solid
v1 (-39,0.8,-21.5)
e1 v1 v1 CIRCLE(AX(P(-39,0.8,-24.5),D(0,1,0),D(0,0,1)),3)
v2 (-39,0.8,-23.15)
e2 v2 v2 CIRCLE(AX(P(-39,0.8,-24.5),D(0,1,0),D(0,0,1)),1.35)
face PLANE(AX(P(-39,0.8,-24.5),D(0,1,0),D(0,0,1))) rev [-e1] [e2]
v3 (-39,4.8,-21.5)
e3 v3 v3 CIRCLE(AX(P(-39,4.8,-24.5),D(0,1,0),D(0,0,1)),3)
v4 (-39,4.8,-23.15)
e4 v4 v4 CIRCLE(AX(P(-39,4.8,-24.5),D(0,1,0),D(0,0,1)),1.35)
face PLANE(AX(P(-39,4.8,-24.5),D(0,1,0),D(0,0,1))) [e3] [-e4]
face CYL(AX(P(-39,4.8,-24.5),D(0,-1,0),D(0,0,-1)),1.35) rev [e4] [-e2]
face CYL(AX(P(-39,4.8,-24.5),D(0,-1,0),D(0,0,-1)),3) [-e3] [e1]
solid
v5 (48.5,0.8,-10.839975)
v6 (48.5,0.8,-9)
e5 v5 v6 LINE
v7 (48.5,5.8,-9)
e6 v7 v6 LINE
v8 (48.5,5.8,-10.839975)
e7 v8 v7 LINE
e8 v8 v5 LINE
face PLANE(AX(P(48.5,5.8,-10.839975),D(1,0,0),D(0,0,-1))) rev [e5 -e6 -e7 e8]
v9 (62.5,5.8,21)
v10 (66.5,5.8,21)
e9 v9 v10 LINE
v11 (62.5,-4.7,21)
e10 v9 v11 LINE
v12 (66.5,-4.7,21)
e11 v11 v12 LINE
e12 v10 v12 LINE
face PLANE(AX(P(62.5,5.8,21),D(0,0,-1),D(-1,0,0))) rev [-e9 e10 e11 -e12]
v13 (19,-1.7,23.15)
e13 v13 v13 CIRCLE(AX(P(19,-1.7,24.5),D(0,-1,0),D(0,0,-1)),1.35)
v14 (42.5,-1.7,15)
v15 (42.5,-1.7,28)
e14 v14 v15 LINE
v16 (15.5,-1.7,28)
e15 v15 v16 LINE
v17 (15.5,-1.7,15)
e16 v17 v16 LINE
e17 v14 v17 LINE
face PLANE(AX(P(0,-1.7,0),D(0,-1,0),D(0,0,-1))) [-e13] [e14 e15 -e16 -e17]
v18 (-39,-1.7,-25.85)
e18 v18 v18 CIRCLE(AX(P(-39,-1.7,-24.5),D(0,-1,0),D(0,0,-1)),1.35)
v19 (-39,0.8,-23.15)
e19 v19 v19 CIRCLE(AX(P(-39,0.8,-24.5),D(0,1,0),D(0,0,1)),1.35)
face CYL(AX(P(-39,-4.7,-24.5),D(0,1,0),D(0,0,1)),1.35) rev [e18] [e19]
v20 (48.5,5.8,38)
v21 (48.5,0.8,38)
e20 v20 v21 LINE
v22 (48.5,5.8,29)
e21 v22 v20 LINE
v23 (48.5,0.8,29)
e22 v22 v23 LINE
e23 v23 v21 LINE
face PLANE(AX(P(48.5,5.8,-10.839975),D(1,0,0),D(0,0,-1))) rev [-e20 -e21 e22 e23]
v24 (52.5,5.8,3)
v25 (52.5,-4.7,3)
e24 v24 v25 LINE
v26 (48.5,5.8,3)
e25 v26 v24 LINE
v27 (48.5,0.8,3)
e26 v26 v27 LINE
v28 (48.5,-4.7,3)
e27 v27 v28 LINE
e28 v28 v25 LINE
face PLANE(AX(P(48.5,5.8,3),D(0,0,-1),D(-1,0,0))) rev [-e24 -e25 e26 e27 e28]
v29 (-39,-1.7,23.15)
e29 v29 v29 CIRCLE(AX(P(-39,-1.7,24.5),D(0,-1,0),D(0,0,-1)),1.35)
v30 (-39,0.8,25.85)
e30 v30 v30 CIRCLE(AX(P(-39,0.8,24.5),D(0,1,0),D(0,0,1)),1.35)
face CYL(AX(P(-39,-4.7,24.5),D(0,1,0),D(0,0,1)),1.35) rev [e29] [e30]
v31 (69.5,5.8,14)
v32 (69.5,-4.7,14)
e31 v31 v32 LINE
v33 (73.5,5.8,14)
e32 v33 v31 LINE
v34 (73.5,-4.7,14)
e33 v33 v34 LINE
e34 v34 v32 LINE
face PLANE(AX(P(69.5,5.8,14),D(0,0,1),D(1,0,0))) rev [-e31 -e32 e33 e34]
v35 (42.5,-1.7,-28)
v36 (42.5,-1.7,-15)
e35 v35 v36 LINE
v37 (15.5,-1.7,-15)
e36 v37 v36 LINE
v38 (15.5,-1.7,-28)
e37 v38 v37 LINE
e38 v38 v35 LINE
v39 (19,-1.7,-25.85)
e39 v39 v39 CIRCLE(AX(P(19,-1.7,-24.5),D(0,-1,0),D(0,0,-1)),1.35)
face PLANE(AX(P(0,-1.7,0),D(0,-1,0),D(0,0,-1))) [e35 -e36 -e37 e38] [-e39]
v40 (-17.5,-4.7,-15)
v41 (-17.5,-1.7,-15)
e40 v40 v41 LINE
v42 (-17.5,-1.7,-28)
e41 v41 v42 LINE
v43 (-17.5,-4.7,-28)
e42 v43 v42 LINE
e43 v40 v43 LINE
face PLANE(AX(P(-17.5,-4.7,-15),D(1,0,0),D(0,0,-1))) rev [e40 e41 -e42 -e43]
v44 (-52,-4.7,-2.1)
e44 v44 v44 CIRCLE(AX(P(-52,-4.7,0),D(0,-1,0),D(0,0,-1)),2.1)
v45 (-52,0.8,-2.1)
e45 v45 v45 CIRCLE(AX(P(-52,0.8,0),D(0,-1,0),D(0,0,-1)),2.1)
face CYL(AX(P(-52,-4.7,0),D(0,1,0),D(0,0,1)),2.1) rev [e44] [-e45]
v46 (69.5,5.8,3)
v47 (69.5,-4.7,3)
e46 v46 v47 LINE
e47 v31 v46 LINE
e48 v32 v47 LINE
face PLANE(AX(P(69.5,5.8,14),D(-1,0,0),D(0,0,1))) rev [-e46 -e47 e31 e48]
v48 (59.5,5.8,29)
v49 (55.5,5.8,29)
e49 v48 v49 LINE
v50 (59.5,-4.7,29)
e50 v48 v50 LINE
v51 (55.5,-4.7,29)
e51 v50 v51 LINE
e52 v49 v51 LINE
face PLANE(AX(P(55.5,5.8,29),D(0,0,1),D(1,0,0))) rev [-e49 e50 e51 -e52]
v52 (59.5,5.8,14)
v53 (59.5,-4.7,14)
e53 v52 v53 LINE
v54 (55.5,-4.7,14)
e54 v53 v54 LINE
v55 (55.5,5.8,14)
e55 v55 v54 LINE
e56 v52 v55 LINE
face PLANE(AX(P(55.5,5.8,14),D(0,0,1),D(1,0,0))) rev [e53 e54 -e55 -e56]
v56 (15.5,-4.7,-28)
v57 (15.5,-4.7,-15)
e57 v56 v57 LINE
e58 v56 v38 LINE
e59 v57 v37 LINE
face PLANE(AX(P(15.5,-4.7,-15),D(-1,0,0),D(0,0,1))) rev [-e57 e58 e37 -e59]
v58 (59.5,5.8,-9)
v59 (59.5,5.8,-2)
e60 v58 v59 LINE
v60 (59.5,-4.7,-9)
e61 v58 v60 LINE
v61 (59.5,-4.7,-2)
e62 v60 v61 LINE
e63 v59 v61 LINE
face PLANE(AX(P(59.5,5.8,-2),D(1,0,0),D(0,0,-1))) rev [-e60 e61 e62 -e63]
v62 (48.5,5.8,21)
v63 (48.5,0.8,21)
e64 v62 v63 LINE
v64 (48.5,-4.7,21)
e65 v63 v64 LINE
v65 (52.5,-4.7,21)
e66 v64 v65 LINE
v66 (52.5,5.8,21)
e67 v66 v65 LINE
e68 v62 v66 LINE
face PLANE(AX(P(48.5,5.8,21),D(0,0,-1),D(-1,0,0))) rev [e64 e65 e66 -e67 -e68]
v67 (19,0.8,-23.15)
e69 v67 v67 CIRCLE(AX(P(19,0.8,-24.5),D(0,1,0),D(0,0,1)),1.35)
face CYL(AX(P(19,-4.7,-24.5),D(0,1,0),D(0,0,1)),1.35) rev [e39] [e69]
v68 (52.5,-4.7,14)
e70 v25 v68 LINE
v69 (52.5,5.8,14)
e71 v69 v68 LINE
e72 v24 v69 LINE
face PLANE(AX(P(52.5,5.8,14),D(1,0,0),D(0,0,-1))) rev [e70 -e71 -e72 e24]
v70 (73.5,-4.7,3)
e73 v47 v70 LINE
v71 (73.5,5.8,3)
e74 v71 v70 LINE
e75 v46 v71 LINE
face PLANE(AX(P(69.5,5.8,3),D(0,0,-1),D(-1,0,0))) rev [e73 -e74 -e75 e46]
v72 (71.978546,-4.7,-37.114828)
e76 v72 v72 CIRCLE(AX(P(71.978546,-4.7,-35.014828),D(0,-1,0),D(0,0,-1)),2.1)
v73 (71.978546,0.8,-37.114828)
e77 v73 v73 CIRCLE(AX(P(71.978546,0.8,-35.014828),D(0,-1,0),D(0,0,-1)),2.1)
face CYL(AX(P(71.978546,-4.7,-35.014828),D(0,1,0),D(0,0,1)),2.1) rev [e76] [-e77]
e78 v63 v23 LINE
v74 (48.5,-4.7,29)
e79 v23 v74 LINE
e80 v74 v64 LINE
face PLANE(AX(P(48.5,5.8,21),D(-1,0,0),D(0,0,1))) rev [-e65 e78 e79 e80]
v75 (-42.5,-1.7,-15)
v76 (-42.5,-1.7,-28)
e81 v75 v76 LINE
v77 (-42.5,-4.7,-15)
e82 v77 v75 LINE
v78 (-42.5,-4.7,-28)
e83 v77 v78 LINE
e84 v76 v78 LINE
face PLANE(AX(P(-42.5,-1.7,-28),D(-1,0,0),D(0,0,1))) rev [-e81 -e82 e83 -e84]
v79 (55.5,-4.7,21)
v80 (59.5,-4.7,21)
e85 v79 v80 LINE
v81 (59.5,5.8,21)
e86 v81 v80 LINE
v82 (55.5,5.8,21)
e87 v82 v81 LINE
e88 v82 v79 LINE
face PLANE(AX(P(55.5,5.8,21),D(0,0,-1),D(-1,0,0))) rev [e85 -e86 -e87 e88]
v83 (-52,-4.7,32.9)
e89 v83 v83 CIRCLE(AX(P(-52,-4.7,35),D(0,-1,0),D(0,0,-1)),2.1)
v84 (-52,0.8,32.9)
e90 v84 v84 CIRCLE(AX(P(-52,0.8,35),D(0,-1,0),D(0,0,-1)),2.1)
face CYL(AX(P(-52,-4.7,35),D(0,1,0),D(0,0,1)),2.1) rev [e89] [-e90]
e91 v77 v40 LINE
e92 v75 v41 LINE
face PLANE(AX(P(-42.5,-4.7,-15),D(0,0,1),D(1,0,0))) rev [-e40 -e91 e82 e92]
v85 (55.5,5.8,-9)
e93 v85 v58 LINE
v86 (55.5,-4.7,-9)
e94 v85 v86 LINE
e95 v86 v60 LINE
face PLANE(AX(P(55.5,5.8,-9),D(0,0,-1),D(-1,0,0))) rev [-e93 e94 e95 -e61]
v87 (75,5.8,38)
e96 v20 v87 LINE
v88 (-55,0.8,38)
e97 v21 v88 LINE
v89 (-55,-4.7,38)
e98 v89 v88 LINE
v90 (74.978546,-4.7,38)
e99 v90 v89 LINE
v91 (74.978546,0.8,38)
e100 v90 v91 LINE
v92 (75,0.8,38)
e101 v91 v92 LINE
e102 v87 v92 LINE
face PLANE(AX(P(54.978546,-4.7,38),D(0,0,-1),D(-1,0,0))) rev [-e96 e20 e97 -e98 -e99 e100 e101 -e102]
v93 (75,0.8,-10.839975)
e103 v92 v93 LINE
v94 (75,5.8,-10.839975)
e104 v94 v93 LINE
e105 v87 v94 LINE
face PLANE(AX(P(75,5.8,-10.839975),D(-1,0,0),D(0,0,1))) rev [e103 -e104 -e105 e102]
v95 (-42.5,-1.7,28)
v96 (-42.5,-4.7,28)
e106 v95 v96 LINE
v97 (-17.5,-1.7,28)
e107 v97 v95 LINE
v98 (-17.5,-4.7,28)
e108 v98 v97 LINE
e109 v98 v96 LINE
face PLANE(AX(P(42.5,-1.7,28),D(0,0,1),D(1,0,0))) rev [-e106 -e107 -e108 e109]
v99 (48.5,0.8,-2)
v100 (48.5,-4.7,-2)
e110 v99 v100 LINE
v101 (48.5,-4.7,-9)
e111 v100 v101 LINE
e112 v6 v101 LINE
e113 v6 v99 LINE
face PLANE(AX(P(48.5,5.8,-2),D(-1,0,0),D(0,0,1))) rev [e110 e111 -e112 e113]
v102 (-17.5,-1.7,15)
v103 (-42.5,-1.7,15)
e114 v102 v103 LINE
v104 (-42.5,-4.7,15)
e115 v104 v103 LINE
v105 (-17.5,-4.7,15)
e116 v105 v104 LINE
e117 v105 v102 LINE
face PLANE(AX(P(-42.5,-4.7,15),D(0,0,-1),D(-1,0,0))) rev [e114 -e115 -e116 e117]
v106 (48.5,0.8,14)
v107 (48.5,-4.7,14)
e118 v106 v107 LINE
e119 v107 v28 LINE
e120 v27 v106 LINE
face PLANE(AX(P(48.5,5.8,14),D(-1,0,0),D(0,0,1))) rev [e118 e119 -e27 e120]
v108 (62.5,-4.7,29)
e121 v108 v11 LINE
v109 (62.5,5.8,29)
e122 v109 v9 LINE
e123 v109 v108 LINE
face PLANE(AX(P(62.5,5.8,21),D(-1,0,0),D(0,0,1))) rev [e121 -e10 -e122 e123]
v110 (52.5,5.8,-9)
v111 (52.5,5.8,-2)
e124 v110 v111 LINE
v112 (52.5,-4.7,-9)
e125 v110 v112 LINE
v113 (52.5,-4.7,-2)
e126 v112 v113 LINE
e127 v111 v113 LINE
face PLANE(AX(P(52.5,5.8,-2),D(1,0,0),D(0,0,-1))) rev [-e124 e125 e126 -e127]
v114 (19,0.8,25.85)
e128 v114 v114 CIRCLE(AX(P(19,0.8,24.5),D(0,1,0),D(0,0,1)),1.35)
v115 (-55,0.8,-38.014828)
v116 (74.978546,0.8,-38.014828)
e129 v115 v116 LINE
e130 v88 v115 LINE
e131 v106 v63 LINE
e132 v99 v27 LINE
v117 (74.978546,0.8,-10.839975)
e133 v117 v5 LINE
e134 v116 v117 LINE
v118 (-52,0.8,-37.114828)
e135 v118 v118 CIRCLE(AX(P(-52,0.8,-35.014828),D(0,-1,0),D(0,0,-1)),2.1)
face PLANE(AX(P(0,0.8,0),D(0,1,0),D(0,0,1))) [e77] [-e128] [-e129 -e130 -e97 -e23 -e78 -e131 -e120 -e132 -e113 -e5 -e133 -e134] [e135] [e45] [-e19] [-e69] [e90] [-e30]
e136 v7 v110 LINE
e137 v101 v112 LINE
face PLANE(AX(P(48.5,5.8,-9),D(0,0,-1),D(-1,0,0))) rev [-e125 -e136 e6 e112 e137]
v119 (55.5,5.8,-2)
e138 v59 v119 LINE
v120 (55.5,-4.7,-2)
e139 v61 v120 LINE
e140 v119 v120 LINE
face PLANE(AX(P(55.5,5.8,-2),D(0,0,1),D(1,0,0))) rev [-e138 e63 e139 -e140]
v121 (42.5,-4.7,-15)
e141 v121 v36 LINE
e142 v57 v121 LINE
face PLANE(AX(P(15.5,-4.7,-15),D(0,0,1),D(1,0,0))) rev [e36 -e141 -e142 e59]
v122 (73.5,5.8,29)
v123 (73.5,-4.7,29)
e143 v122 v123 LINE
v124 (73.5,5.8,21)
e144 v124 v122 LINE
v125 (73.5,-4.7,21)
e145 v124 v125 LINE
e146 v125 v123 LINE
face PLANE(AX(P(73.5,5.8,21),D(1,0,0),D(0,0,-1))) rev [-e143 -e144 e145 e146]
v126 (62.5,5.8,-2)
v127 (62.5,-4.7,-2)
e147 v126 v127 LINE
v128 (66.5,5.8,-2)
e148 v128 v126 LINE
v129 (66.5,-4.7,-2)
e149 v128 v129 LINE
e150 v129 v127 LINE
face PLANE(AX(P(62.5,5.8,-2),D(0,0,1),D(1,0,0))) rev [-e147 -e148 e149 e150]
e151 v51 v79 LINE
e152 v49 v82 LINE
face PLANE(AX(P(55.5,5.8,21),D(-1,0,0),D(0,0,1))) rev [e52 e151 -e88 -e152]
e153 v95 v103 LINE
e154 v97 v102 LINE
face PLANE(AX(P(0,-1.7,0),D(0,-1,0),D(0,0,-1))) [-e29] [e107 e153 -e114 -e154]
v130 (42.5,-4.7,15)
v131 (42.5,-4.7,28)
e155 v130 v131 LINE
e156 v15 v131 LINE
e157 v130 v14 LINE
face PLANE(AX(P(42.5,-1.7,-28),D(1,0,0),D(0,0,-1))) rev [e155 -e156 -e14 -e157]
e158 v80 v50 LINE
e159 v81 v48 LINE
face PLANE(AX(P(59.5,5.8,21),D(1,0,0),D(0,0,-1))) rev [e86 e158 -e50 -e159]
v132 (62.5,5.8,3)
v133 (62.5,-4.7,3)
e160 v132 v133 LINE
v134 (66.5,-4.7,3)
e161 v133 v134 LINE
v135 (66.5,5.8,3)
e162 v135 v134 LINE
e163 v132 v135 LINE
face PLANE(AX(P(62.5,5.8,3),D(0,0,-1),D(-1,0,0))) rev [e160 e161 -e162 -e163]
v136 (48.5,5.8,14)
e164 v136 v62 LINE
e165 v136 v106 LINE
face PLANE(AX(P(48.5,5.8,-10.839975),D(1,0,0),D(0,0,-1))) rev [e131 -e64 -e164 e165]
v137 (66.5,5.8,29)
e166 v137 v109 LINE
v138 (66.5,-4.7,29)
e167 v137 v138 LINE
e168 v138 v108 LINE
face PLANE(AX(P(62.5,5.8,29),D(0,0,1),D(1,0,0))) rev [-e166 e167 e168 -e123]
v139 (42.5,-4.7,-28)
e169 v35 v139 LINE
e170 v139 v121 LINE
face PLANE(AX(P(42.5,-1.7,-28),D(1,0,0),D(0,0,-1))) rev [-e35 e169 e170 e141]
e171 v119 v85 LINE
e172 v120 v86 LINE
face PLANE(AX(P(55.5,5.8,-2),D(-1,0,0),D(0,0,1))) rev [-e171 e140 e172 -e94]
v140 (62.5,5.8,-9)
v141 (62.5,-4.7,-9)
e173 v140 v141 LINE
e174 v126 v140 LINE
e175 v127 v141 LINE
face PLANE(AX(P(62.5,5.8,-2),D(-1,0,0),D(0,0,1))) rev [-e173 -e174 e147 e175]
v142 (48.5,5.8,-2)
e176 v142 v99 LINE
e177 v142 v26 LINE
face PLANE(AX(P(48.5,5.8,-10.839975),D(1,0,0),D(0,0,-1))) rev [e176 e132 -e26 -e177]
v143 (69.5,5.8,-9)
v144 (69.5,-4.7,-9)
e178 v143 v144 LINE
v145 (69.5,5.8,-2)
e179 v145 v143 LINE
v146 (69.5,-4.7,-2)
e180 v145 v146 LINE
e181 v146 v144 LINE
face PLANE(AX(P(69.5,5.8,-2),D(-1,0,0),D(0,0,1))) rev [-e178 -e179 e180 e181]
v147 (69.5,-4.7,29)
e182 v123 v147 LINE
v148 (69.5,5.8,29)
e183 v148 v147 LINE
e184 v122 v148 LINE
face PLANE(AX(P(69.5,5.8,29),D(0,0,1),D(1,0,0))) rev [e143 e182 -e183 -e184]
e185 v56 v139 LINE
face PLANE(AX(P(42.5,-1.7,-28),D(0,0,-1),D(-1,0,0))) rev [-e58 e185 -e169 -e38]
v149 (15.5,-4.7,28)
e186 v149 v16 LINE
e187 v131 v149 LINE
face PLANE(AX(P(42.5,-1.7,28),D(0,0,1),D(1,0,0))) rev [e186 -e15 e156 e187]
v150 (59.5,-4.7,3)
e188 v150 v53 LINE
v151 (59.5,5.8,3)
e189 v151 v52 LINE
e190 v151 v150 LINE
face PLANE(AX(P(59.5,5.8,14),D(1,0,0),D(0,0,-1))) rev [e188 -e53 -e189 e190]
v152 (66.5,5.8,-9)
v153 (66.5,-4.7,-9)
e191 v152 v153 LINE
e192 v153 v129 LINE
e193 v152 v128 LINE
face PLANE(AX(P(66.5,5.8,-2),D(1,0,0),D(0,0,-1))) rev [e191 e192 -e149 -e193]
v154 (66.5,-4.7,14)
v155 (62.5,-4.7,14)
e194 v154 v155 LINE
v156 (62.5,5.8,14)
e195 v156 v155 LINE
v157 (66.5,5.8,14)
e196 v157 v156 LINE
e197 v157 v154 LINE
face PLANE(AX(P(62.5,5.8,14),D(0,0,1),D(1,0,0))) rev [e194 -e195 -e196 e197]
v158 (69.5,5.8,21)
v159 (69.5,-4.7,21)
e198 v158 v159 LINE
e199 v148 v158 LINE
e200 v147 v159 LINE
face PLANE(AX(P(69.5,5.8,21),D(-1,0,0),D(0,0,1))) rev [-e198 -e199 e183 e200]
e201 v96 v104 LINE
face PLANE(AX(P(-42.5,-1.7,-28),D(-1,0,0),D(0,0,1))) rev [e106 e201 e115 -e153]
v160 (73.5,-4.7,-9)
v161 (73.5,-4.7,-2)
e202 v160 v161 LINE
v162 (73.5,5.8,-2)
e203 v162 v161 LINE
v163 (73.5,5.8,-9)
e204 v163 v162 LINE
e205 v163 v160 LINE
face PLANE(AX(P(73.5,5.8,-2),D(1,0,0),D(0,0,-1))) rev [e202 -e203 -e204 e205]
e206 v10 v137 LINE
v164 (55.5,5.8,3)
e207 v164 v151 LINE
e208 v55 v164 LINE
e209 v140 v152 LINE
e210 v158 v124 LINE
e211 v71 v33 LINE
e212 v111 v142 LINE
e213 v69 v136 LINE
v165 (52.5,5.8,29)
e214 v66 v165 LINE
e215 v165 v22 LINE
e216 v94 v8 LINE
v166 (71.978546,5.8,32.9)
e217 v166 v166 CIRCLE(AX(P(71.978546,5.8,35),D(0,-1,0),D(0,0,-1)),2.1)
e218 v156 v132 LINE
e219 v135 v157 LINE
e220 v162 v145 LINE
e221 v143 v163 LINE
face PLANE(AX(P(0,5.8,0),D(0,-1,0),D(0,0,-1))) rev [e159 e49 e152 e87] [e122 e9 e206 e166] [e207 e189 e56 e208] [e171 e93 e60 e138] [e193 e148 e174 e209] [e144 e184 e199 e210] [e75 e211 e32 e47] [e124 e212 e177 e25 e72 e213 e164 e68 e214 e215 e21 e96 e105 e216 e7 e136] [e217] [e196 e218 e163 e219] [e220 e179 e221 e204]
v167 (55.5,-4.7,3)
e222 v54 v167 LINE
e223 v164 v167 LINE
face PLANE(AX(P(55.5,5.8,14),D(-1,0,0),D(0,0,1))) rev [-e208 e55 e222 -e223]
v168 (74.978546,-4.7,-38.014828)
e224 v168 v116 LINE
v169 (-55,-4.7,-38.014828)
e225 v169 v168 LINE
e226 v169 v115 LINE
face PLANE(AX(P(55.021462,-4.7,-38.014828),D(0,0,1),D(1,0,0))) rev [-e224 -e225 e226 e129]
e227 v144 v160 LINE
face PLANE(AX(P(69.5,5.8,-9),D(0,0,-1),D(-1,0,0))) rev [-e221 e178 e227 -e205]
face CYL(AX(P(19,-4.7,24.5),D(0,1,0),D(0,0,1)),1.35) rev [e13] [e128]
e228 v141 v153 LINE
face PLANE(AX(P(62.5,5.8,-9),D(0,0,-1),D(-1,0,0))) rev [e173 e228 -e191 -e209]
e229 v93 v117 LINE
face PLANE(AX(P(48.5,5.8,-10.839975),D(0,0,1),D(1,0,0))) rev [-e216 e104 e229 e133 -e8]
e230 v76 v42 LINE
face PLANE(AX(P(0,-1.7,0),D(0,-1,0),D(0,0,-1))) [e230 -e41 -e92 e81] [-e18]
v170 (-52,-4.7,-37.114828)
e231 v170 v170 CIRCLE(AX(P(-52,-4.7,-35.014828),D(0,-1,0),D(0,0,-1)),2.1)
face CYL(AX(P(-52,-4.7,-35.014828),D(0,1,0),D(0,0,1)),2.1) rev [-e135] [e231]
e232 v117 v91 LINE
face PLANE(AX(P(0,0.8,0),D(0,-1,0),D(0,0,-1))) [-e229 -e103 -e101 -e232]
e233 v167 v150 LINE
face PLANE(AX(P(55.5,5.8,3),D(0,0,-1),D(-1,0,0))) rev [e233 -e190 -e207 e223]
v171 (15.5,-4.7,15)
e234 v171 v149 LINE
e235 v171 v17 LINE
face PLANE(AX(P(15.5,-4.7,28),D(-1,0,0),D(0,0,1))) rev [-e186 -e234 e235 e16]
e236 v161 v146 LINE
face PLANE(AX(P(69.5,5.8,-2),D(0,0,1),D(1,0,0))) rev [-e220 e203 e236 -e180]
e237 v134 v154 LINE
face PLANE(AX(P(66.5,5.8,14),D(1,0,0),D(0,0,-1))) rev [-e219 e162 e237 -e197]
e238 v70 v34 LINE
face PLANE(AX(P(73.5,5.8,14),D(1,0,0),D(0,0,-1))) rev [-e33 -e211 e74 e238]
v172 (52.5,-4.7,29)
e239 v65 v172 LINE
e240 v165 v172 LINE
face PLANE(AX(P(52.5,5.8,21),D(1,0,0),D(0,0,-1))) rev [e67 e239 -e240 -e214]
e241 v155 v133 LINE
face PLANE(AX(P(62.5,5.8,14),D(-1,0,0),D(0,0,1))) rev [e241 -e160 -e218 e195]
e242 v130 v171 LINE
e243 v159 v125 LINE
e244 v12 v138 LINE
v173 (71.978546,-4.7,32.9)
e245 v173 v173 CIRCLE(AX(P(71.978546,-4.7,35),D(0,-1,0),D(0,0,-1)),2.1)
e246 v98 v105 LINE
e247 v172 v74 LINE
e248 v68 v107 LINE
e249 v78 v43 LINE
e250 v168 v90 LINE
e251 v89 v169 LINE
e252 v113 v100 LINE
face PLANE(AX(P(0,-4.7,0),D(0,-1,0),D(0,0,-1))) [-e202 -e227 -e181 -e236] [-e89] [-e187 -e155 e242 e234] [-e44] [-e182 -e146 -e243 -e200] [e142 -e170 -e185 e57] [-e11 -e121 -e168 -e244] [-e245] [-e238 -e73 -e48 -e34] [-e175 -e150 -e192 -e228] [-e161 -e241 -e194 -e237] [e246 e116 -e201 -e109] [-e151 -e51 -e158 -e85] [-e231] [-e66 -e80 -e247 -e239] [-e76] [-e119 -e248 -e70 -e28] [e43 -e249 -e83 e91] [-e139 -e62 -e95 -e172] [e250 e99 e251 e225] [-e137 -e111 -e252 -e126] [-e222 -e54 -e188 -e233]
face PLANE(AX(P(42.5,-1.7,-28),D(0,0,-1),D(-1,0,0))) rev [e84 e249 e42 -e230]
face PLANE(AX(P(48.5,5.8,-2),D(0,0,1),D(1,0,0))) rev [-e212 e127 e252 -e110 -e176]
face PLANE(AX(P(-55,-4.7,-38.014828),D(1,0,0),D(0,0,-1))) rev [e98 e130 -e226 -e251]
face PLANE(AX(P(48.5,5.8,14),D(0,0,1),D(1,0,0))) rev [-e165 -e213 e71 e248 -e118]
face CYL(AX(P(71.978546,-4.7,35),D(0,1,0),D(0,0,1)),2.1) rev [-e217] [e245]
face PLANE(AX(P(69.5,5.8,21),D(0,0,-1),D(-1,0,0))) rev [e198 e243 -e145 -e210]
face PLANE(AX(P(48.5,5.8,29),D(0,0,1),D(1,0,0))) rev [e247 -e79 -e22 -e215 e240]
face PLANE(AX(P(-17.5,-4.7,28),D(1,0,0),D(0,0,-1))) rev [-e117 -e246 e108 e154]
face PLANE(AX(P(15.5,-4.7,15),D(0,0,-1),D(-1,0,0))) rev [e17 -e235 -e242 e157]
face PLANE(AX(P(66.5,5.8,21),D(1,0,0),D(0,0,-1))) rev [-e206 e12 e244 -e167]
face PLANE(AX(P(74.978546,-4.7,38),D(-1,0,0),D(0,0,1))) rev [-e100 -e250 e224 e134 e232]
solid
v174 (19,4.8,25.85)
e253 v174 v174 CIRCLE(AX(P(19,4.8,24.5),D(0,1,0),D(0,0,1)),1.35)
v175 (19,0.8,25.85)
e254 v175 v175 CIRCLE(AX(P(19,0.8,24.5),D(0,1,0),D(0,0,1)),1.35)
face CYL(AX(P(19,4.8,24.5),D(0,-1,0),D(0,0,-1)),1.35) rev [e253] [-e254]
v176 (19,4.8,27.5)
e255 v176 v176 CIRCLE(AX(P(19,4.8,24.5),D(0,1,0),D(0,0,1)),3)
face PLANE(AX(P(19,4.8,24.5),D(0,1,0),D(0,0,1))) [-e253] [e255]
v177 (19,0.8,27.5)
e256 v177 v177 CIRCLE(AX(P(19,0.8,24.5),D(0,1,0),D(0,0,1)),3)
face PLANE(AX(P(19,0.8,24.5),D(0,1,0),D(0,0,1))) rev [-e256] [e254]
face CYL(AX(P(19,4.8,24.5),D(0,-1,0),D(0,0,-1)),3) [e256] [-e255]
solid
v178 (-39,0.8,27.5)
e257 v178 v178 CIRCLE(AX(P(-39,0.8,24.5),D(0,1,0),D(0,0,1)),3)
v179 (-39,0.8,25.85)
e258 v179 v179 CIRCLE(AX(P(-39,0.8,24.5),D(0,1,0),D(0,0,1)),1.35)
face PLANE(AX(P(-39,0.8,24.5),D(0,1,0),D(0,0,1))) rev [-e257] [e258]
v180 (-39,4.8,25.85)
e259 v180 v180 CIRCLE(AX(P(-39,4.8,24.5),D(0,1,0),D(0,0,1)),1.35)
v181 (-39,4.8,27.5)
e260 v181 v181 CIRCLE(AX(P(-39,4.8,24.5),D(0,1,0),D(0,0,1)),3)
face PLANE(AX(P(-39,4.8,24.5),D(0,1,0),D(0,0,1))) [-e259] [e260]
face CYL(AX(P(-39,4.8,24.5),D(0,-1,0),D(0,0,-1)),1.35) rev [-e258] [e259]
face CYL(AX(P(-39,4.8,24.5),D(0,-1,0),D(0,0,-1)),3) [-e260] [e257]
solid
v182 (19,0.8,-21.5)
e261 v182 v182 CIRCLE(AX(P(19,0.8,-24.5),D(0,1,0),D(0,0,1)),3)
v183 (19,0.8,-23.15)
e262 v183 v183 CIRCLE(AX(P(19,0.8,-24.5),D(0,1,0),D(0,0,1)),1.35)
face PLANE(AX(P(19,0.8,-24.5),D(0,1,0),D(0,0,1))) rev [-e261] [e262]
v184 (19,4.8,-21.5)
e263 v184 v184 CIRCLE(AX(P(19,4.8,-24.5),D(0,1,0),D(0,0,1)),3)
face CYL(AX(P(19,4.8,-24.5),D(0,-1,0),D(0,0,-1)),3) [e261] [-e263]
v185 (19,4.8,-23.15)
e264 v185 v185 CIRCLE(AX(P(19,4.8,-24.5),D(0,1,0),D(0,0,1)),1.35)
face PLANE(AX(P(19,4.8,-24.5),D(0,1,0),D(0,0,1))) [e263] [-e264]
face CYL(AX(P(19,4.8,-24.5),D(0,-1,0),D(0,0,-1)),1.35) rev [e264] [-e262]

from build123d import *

# Parameters (mm, degrees)
BASES_W                         = 85
BASES_H                         = 56
BASE_DEPTH                      = 0.8
M2_5_CLEARANCE_HOLE_D           = 2.7
FASTENERAREA_START              = -0.01
FASTENERAREAS_R                 = 3
FASTENERAREAS_R_2               = 1.35
FASTENERAREA_DEPTH              = 0.01
FASTENERAREAS_2_R               = 3
FASTENERAREAS_2_R_2             = 1.35
BOSS_EXTRUDE1_DEPTH             = 4
BOSS_EXTRUDE1_2_DEPTH           = 4
HLP_START                       = 0.8
HLP_FASTENERHOLES_OUTLINE_R     = 3
HLP_FASTENERHOLES_OUTLINE_R_2   = 1.35
HLP_FASTENERHOLES_DEPTH         = 4
HLP_FASTENERHOLES_2_OUTLINE_R   = 3
HLP_FASTENERHOLES_2_OUTLINE_R_2 = 1.35
HLP_FASTENERHOLES_2_DEPTH       = 4
HLP_START_2                     = -2
HLP_FASTENERHOLES_3_OUTLINE_R   = 1.35
HLP_FASTENERHOLES_3_DEPTH       = 4
HLP_START_3                     = 0.79
HLP_FASTENERHOLES_4_OUTLINE_R   = 3
HLP_FASTENERHOLES_4_OUTLINE_R_2 = 1.35
HLP_FASTENERHOLES_4_DEPTH       = 1.21
SKETCH4_R                       = 2.1
BOSS_EXTRUDE2_DEPTH             = 5.5
SKETCH7_W                       = 85
SKETCH7_H                       = 56
CUT_EXTRUDE4_DEPTH              = 3
CUT_EXTRUDE5_DEPTH              = 85.244641278
CUT_EXTRUDE5_DEPTH_BACK         = 85.244641278
SKETCH8_R                       = 1.35
SKETCH9_W                       = 26.5
SKETCH9_H                       = 48.839975475
BOSS_EXTRUDE3_DEPTH             = 5
SKETCH12_R                      = 2.1
SKETCH12_W                      = 4
SKETCH12_H                      = 11
SKETCH12_H_2                    = 8
SKETCH12_H_3                    = 7
CUT_EXTRUDE6_DEPTH              = 85.737106223
BOSS_EXTRUDE4_DEPTH             = 3


with BuildPart() as part:
    # BaseS → Base (new, symmetric)
    with BuildSketch(Plane(origin=(0, 0, 0), x_dir=(1, 0, 0), z_dir=(0, 1, 0))):
        Rectangle(BASES_W, BASES_H)
    extrude(amount=BASE_DEPTH, both=True)

    # M2.5 Clearance Hole (through all)
    with Locations(Plane(origin=(0, 0.8, 0), x_dir=(1, 0, 0), z_dir=(0, 1, 0))):
        with Locations((-39, 24.5), (-39, -24.5)):
            Hole(M2_5_CLEARANCE_HOLE_D / 2)

    # FastenerAreaS → FastenerArea (cut)
    # profile 1 of 2: a face of its own
    with BuildSketch(Plane(origin=(0, 0.8, 0), x_dir=(1, 0, 0), z_dir=(0, 1, 0)).offset(FASTENERAREA_START)):
        with Locations(Location((-39, -24.5, 0), (0, 0, 270))):
            Circle(FASTENERAREAS_R)
        with Locations(Location((-39, -24.5, 0), (0, 0, 270))):
            Circle(FASTENERAREAS_R_2, mode=Mode.SUBTRACT)
    # profile 2 of 2: a face of its own
    with BuildSketch(Plane(origin=(0, 0.8, 0), x_dir=(1, 0, 0), z_dir=(0, 1, 0)).offset(FASTENERAREA_START)):
        with Locations(Location((-39, 24.5, 0), (0, 0, 270))):
            Circle(FASTENERAREAS_R)
        with Locations(Location((-39, 24.5, 0), (0, 0, 270))):
            Circle(FASTENERAREAS_R_2, mode=Mode.SUBTRACT)
    fastenerarea = extrude(amount=FASTENERAREA_DEPTH, mode=Mode.SUBTRACT)

    # HLP FastenerHoles 3 outline → HLP FastenerHoles 3 (cut)
    with BuildSketch(Plane(origin=(0, 0, 0), x_dir=(1, 0, 0), z_dir=(0, 1, 0)).offset(HLP_START_2)):
        with Locations((19, -24.5)):
            Circle(HLP_FASTENERHOLES_3_OUTLINE_R)
        with Locations((19, 24.5)):
            Circle(HLP_FASTENERHOLES_3_OUTLINE_R)
    hlp_fastenerholes_3 = extrude(amount=HLP_FASTENERHOLES_3_DEPTH, mode=Mode.SUBTRACT)

    # HLP FastenerHoles 4 outline → HLP FastenerHoles 4 (cut)
    # profile 1 of 2: a face of its own
    with BuildSketch(Plane(origin=(0, 0, 0), x_dir=(1, 0, 0), z_dir=(0, 1, 0)).offset(HLP_START_3)):
        with Locations((19, 24.5)):
            Circle(HLP_FASTENERHOLES_4_OUTLINE_R)
        with Locations((19, 24.5)):
            Circle(HLP_FASTENERHOLES_4_OUTLINE_R_2, mode=Mode.SUBTRACT)
    # profile 2 of 2: a face of its own
    with BuildSketch(Plane(origin=(0, 0, 0), x_dir=(1, 0, 0), z_dir=(0, 1, 0)).offset(HLP_START_3)):
        with Locations((19, -24.5)):
            Circle(HLP_FASTENERHOLES_4_OUTLINE_R)
        with Locations((19, -24.5)):
            Circle(HLP_FASTENERHOLES_4_OUTLINE_R_2, mode=Mode.SUBTRACT)
    hlp_fastenerholes_4 = extrude(amount=HLP_FASTENERHOLES_4_DEPTH, mode=Mode.SUBTRACT)


with BuildPart() as body_2:
    # FastenerAreaS<2> → Boss-Extrude1 (new body)
    with BuildSketch(Plane(origin=(0, 0.8, 0), x_dir=(1, 0, 0), z_dir=(0, 1, 0))):
        with Locations(Location((-39, -24.5, 0), (0, 0, 270))):
            Circle(FASTENERAREAS_2_R)
        with Locations(Location((-39, -24.5, 0), (0, 0, 270))):
            Circle(FASTENERAREAS_2_R_2, mode=Mode.SUBTRACT)
    extrude(amount=BOSS_EXTRUDE1_DEPTH)


with BuildPart() as body_3:
    # FastenerAreaS<2> → Boss-Extrude1 2 (new body)
    with BuildSketch(Plane(origin=(0, 0.8, 0), x_dir=(1, 0, 0), z_dir=(0, 1, 0))):
        with Locations(Location((-39, 24.5, 0), (0, 0, 270))):
            Circle(FASTENERAREAS_2_R)
        with Locations(Location((-39, 24.5, 0), (0, 0, 270))):
            Circle(FASTENERAREAS_2_R_2, mode=Mode.SUBTRACT)
    extrude(amount=BOSS_EXTRUDE1_2_DEPTH)


with BuildPart() as body_4:
    # HLP FastenerHoles: read off the stored shape, not the designer's step
    # HLP FastenerHoles outline → HLP FastenerHoles (new body)
    with BuildSketch(Plane(origin=(0, 0, 0), x_dir=(1, 0, 0), z_dir=(0, 1, 0)).offset(HLP_START)):
        with Locations((19, 24.5)):
            Circle(HLP_FASTENERHOLES_OUTLINE_R)
        with Locations((19, 24.5)):
            Circle(HLP_FASTENERHOLES_OUTLINE_R_2, mode=Mode.SUBTRACT)
    hlp_fastenerholes = extrude(amount=HLP_FASTENERHOLES_DEPTH)


with BuildPart() as body_5:
    # HLP FastenerHoles 2 outline → HLP FastenerHoles 2 (new body)
    with BuildSketch(Plane(origin=(0, 0, 0), x_dir=(1, 0, 0), z_dir=(0, 1, 0)).offset(HLP_START)):
        with Locations((19, -24.5)):
            Circle(HLP_FASTENERHOLES_2_OUTLINE_R)
        with Locations((19, -24.5)):
            Circle(HLP_FASTENERHOLES_2_OUTLINE_R_2, mode=Mode.SUBTRACT)
    hlp_fastenerholes_2 = extrude(amount=HLP_FASTENERHOLES_2_DEPTH)


with BuildPart() as part_1:
    add(part.part)

    # VM FA: FastenerArea, HLP FastenerHoles, HLP FastenerHoles 2, HLP FastenerHoles 3, HLP FastenerHoles 4 across plane
    add(fastenerarea.mirror(Plane.ZX), mode=Mode.SUBTRACT)
    add(hlp_fastenerholes.mirror(Plane.ZX), mode=Mode.SUBTRACT)
    add(hlp_fastenerholes_2.mirror(Plane.ZX), mode=Mode.SUBTRACT)
    add(hlp_fastenerholes_3.mirror(Plane.ZX), mode=Mode.SUBTRACT)
    add(hlp_fastenerholes_4.mirror(Plane.ZX), mode=Mode.SUBTRACT)

    # Sketch4 → Boss-Extrude2 (add)
    with BuildSketch(Plane.XZ.offset(-0.8)):
        Polygon((55.021462019, -38.014828304), (-55, -38.014828304), (-55, 38), (54.978546352, 38), (74.978546352, 38), (74.978546352, -38.014828304), align=None)
        with Locations(Location((-52, 35, 0), (0, 0, 270))):
            Circle(SKETCH4_R, mode=Mode.SUBTRACT)
        with Locations(Location((-52, -35.014828304, 0), (0, 0, 270))):
            Circle(SKETCH4_R, mode=Mode.SUBTRACT)
        with Locations(Location((71.978546352, -35.014828304, 0), (0, 0, 270))):
            Circle(SKETCH4_R, mode=Mode.SUBTRACT)
        with Locations(Location((71.978546352, 35, 0), (0, 0, 270))):
            Circle(SKETCH4_R, mode=Mode.SUBTRACT)
        with Locations(Location((-52, 0, 0), (0, 0, 270))):
            Circle(SKETCH4_R, mode=Mode.SUBTRACT)
    extrude(amount=BOSS_EXTRUDE2_DEPTH)

    # Sketch7 → Cut-Extrude4 (cut)
    with BuildSketch(Plane.XZ.offset(4.7)):
        Rectangle(SKETCH7_W, SKETCH7_H)
    extrude(amount=-CUT_EXTRUDE4_DEPTH, mode=Mode.SUBTRACT)

    # Sketch8 → Cut-Extrude5 (cut, two sides: drawn at the far end of the back side and taken through both)
    with BuildSketch(Plane(origin=(0, 0.8, 0), x_dir=(1, 0, 0), z_dir=(0, 1, 0)).offset(-CUT_EXTRUDE5_DEPTH_BACK)):
        with Locations(Location((19, -24.5, 0), (0, 0, 270))):
            Circle(SKETCH8_R)
        with Locations(Location((19, 24.5, 0), (0, 0, 270))):
            Circle(SKETCH8_R)
        with Locations(Location((-39, 24.5, 0), (0, 0, 270))):
            Circle(SKETCH8_R)
        with Locations(Location((-39, -24.5, 0), (0, 0, 270))):
            Circle(SKETCH8_R)
    extrude(amount=CUT_EXTRUDE5_DEPTH + CUT_EXTRUDE5_DEPTH_BACK, mode=Mode.SUBTRACT)

    # Sketch9 → Boss-Extrude3 (add)
    with BuildSketch(Plane(origin=(0, 0.8, 0), x_dir=(1, 0, 0), z_dir=(0, 1, 0))):
        with Locations((61.75, -13.580012262)):
            Rectangle(SKETCH9_W, SKETCH9_H)
    extrude(amount=BOSS_EXTRUDE3_DEPTH)

    # Sketch12 → Cut-Extrude6 (cut, through all)
    with BuildSketch(Plane.XZ.offset(4.7)):
        with Locations(Location((71.978546352, 35, 0), (0, 0, 270))):
            Circle(SKETCH12_R)
        with Locations(Location((71.978546352, -35.014828304, 0), (0, 0, 270))):
            Circle(SKETCH12_R)
        with Locations((57.5, 8.5)):
            Rectangle(SKETCH12_W, SKETCH12_H)
        with Locations((50.5, 8.5)):
            Rectangle(SKETCH12_W, SKETCH12_H)
        with Locations((64.5, 8.5)):
            Rectangle(SKETCH12_W, SKETCH12_H)
        with Locations((71.5, 8.5)):
            Rectangle(SKETCH12_W, SKETCH12_H)
        with Locations((50.5, 25)):
            Rectangle(SKETCH12_W, SKETCH12_H_2)
        with Locations((57.5, 25)):
            Rectangle(SKETCH12_W, SKETCH12_H_2)
        with Locations((64.5, 25)):
            Rectangle(SKETCH12_W, SKETCH12_H_2)
        with Locations((71.5, 25)):
            Rectangle(SKETCH12_W, SKETCH12_H_2)
        with Locations((50.5, -5.5)):
            Rectangle(SKETCH12_W, SKETCH12_H_3)
        with Locations((57.5, -5.5)):
            Rectangle(SKETCH12_W, SKETCH12_H_3)
        with Locations((64.5, -5.5)):
            Rectangle(SKETCH12_W, SKETCH12_H_3)
        with Locations((71.5, -5.5)):
            Rectangle(SKETCH12_W, SKETCH12_H_3)
    extrude(amount=-CUT_EXTRUDE6_DEPTH, mode=Mode.SUBTRACT)

    # Sketch13 → Boss-Extrude4 (add)
    with BuildSketch(Plane.XZ.offset(1.7)):
        Polygon((-42.5, -15), (-42.5, 15), (-17.5, 15), (-17.5, 28), (15.5, 28), (15.5, 15), (42.5, 15), (42.5, -15), (15.5, -15), (15.5, -28), (-17.5, -28), (-17.5, -15), align=None)
    extrude(amount=BOSS_EXTRUDE4_DEPTH)


solid = Compound([body_2.part, body_3.part, body_4.part, body_5.part, part_1.part])
